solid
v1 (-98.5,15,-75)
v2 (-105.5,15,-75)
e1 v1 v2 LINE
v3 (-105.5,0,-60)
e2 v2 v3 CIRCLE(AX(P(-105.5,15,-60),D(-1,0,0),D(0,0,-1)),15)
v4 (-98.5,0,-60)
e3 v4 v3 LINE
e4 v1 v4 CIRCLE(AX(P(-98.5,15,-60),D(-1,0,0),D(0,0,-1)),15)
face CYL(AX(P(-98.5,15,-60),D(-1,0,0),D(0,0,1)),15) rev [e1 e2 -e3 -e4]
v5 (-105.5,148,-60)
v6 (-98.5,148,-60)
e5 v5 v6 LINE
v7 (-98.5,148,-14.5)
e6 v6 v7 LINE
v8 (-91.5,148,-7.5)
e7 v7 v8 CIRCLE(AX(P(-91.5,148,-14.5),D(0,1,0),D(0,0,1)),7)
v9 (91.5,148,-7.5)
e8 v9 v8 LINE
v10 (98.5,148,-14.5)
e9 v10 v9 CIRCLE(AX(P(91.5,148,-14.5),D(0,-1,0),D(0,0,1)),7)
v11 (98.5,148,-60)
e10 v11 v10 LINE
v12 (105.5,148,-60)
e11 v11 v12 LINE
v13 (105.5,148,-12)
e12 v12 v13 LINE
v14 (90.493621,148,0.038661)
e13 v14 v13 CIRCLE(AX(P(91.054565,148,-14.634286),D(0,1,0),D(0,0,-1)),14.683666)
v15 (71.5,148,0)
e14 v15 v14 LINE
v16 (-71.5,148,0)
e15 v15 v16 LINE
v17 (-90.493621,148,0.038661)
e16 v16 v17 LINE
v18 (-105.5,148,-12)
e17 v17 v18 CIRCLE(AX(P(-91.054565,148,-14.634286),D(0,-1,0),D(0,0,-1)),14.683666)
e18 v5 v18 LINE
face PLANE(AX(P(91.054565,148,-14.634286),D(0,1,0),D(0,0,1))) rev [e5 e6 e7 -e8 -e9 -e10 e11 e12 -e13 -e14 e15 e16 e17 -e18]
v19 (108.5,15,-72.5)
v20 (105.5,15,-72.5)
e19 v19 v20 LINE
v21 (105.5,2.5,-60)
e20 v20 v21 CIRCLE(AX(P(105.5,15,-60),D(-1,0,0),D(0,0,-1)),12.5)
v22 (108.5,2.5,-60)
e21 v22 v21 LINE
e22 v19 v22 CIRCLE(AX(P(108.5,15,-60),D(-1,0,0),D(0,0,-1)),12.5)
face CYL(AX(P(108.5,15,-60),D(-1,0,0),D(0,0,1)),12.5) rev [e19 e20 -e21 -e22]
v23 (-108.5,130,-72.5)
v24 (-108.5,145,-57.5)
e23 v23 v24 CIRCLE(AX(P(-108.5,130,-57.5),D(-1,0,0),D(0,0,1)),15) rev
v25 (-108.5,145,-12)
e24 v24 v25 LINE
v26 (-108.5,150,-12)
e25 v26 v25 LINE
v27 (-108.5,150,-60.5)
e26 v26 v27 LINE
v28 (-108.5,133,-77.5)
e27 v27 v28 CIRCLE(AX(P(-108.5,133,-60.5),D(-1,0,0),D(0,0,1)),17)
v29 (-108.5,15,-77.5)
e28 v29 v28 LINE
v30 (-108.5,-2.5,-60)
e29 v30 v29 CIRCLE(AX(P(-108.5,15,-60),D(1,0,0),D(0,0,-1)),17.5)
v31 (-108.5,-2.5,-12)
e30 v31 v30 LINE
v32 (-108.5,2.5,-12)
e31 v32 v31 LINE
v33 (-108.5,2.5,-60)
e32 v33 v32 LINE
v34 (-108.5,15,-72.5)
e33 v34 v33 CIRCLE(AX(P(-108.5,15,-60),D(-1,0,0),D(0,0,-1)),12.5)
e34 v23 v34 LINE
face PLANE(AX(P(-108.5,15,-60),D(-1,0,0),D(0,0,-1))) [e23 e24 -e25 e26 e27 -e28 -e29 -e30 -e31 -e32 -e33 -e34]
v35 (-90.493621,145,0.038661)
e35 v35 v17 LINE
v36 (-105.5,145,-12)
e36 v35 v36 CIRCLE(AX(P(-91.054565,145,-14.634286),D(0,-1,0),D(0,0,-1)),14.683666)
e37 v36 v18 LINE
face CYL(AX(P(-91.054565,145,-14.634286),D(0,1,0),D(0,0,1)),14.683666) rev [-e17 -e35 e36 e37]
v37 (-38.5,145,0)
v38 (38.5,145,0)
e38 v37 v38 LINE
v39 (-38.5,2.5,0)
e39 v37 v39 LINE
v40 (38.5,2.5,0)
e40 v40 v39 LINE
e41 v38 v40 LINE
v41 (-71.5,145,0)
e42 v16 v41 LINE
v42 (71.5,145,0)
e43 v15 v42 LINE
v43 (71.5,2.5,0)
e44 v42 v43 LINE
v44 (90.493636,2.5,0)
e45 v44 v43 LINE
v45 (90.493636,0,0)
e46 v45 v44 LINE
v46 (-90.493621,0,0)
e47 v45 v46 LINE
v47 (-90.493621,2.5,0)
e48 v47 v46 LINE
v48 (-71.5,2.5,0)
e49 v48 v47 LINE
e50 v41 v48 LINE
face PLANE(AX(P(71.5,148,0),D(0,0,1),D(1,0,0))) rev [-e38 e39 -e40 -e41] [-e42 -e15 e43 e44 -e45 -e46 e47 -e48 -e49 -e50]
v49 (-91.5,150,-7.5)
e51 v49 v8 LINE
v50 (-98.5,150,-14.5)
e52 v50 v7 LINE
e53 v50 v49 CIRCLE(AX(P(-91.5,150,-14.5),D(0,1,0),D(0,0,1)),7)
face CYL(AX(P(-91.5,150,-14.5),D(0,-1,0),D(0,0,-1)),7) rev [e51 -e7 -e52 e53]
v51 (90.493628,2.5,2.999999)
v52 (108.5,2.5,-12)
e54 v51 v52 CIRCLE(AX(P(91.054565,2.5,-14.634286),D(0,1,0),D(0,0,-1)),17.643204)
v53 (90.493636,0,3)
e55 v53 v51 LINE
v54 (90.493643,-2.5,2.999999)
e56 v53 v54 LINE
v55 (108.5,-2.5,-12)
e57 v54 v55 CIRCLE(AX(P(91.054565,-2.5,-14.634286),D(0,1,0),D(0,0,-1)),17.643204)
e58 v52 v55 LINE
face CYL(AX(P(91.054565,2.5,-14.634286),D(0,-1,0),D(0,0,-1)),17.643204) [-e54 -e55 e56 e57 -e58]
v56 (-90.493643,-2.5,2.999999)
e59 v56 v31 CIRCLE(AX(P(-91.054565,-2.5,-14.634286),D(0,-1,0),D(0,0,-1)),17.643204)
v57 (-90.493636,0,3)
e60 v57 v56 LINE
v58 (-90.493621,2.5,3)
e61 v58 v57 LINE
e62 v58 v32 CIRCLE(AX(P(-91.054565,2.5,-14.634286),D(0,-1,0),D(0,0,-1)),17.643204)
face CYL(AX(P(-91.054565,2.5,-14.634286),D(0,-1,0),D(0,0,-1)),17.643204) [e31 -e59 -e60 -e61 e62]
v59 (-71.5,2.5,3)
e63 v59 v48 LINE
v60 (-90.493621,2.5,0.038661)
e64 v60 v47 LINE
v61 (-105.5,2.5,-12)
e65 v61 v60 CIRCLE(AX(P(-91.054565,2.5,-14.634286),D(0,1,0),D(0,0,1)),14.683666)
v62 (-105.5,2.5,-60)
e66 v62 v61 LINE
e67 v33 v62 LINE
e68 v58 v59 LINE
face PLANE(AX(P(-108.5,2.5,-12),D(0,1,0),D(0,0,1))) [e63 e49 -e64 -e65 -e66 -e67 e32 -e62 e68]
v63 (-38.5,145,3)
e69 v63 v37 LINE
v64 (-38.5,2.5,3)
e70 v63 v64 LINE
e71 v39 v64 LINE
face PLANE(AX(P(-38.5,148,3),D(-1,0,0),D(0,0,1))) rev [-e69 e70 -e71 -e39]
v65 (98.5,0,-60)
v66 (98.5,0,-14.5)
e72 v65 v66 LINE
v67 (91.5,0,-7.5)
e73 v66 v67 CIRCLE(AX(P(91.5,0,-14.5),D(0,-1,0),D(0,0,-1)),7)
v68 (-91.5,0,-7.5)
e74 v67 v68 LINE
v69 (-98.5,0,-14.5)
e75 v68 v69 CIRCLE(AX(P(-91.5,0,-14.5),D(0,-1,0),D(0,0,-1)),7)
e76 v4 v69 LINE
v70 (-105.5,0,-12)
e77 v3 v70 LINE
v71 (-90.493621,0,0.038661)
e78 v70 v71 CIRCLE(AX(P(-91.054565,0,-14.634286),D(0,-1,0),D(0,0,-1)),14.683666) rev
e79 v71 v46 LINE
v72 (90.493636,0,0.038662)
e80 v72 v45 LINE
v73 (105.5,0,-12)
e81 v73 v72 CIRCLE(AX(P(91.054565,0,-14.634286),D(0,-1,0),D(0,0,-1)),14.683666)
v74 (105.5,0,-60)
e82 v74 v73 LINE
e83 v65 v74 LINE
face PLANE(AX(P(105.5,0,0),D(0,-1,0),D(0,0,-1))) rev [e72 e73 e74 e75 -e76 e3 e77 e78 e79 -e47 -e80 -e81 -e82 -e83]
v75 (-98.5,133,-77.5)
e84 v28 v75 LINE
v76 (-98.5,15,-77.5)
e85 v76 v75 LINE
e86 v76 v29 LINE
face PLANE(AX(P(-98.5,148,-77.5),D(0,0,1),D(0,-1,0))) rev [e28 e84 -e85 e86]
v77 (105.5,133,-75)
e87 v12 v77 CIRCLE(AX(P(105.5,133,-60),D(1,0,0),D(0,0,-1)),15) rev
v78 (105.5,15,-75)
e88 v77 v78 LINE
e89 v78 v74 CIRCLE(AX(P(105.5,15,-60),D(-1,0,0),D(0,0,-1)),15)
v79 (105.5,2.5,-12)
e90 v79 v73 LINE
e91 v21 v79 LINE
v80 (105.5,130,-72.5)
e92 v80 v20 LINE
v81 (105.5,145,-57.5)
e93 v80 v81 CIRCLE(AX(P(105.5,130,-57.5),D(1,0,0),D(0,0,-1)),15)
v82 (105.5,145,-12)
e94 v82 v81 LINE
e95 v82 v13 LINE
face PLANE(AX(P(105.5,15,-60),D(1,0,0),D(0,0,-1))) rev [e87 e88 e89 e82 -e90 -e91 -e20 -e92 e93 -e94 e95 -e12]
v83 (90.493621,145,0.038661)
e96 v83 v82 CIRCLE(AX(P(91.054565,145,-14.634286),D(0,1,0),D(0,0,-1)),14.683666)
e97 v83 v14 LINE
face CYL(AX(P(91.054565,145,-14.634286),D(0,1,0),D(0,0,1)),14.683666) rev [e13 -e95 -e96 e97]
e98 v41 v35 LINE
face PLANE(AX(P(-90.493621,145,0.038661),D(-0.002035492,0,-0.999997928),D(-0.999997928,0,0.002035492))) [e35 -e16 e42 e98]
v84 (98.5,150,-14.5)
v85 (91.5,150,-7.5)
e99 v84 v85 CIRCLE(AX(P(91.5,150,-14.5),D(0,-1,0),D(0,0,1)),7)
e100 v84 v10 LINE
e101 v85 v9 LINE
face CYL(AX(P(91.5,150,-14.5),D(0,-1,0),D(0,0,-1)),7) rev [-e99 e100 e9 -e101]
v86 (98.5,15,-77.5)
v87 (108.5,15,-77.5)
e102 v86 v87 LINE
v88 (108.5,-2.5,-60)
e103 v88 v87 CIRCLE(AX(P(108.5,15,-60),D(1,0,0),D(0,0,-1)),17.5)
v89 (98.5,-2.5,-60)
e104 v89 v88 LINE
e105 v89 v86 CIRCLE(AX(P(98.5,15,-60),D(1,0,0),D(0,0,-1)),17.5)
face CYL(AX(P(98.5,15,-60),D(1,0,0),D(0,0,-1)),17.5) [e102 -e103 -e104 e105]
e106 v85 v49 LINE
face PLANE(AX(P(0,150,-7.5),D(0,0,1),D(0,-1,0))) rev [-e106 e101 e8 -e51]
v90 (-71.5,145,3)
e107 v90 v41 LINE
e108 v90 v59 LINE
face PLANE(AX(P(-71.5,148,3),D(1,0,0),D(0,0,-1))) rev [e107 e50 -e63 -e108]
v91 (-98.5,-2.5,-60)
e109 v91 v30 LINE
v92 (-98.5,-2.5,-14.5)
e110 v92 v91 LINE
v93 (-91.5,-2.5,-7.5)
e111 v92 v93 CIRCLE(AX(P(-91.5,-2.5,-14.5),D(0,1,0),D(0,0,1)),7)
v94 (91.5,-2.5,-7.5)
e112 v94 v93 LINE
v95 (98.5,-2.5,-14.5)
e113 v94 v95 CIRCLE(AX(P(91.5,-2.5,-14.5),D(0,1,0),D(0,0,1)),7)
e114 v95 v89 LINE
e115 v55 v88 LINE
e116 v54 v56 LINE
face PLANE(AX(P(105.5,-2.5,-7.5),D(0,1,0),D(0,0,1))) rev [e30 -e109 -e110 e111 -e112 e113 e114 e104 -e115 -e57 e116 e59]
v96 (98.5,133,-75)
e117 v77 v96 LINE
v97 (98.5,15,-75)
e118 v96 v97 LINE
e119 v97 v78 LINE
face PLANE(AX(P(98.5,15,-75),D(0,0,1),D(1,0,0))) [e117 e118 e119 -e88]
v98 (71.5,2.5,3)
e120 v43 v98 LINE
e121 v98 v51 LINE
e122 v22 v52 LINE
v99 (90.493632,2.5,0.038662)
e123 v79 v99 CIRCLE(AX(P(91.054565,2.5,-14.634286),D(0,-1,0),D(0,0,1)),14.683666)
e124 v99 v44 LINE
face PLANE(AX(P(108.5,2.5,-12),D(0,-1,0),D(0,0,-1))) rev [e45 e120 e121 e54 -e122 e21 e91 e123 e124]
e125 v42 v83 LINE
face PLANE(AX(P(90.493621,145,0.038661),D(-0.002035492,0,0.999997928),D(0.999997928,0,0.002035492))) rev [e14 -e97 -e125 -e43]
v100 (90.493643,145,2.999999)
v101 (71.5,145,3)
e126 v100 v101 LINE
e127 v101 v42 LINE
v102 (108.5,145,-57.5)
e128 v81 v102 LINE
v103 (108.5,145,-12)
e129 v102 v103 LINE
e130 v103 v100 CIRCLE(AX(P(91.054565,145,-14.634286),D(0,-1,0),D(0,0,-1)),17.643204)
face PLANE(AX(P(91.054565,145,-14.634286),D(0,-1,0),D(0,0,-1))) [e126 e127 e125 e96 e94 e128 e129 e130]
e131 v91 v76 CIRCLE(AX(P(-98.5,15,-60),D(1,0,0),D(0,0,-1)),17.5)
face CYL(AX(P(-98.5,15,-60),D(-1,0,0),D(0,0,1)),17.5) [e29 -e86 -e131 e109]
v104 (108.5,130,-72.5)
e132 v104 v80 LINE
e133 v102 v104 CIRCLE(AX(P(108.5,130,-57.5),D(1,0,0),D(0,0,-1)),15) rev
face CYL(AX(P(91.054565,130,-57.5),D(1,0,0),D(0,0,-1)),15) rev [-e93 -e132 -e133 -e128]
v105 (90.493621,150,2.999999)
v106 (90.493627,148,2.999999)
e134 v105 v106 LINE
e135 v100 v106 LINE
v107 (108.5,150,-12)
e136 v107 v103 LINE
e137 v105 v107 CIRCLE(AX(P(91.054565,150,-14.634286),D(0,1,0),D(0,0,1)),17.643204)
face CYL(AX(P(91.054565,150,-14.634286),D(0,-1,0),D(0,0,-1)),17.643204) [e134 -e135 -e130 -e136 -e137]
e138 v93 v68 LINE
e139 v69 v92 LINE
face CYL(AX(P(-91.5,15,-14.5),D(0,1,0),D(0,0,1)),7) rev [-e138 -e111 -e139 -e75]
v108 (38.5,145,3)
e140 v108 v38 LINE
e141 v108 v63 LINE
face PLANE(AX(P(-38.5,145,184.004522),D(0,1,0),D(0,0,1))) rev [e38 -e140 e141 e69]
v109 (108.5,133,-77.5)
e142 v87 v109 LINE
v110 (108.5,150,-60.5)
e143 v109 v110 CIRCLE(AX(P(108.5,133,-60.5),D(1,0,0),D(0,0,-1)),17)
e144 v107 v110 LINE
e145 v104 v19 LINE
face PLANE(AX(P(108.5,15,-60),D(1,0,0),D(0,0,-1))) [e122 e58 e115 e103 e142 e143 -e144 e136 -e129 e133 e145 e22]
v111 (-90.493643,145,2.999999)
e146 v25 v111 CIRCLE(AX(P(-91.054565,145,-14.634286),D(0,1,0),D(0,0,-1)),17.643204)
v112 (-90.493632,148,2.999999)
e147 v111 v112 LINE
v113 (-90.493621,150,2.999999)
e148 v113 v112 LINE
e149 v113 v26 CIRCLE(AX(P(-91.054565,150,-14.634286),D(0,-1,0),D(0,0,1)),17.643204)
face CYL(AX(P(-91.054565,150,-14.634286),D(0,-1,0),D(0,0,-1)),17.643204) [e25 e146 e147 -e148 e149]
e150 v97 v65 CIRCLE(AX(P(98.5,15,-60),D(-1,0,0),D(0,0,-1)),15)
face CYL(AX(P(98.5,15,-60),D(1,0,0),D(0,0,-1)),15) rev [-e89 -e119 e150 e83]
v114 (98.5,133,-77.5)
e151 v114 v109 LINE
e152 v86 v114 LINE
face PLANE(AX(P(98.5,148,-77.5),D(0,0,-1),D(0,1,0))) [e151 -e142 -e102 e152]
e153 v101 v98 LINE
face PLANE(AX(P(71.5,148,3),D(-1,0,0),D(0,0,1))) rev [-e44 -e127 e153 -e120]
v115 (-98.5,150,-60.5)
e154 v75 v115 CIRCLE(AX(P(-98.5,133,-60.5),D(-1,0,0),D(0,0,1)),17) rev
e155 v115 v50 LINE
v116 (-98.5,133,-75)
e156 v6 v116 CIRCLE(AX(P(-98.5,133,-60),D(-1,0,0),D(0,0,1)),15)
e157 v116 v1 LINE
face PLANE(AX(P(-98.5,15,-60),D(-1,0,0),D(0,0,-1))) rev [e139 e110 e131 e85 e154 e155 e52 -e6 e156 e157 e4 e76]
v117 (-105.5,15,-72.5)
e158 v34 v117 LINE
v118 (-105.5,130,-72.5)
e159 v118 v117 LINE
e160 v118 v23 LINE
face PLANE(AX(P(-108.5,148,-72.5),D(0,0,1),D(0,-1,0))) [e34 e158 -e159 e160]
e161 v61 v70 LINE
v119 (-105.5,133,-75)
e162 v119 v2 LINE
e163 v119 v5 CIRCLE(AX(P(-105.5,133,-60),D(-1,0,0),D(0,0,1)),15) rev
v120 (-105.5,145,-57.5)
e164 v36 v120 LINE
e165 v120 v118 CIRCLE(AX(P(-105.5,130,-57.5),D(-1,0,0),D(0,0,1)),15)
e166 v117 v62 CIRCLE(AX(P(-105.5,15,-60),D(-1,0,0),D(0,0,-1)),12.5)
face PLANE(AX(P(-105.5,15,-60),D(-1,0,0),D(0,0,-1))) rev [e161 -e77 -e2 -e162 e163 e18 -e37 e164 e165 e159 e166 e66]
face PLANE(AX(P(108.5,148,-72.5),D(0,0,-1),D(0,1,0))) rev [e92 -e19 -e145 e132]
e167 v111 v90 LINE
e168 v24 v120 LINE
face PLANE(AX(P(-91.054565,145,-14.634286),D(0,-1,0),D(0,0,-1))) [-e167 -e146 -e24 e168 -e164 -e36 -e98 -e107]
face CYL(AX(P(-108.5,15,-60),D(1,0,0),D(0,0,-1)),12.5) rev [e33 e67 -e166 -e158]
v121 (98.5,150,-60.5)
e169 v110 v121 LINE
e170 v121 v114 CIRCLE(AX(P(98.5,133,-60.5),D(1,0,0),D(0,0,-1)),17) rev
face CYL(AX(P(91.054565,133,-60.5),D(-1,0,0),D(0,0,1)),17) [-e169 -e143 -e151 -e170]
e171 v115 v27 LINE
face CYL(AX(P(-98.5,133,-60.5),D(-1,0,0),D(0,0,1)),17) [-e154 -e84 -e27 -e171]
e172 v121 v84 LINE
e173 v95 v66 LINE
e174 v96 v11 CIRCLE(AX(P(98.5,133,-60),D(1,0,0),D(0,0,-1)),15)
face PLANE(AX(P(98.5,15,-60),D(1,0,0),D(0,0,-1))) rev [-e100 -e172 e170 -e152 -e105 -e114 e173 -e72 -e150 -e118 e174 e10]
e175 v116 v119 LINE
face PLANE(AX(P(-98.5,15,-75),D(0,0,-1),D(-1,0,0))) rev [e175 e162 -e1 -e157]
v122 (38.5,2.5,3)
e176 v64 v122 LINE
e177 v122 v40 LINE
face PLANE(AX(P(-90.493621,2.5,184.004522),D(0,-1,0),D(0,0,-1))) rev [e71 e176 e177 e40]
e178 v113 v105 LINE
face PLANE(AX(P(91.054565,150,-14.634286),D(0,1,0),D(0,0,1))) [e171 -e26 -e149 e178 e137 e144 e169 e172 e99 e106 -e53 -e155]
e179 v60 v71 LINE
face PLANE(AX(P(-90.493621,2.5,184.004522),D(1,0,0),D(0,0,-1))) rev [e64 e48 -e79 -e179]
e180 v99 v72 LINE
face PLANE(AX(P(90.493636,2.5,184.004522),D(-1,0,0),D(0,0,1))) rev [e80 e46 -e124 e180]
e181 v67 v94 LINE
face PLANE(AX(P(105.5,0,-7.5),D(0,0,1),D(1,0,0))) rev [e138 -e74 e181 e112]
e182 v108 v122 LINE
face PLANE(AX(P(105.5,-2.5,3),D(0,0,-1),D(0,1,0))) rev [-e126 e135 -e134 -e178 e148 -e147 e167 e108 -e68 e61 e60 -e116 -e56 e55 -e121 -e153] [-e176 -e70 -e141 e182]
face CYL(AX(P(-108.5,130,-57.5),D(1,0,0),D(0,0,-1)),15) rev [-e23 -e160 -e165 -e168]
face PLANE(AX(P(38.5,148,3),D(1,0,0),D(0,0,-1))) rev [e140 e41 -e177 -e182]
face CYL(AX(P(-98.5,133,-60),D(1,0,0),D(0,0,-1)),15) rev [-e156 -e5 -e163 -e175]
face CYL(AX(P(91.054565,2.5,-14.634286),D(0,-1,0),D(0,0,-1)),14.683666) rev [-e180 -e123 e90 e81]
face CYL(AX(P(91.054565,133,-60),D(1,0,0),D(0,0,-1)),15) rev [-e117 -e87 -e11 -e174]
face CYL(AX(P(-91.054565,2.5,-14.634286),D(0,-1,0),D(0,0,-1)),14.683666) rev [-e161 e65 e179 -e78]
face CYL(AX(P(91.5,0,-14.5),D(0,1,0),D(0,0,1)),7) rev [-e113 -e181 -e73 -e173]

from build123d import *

# Parameters (mm, degrees)
EXTRUDE_1_DEPTH        = 105.5
EXTRUDE_3_DEPTH        = 7
FILLET_2_R             = 15
SKETCH_6_W             = 33
SKETCH_6_H             = 3
EXTRUDE_4_DEPTH        = 148
EXTRUDE_START          = 3
EXTRUDE_5_DEPTH        = 3
EXTRUDE_6_DEPTH        = 2.5
FILLET_3_R             = 7
EXTRUDE_START_2        = 2
EXTRUDE_7_DEPTH        = 2
EXTRUDE_8_DEPTH        = 3
FILLET_4_R             = 15
FILLET_5_R             = 17
FILLET_3_OF_MIRROR_1_R = 7
FILLET_4_OF_MIRROR_1_R = 15
FILLET_5_OF_MIRROR_1_R = 17
EXTRUDE_9_OUTLINE_W    = 77
EXTRUDE_9_OUTLINE_H    = 3
EXTRUDE_9_DEPTH        = 2.5
EXTRUDE_START_3        = 145
EXTRUDE_9_2_OUTLINE_W  = 77
EXTRUDE_9_2_OUTLINE_H  = 3
EXTRUDE_9_2_DEPTH      = 3


# Read off the part's stored shape, not the designer's step: 보스-돌출9
with BuildPart() as part:
    # 스케치1 → 보스-돌출1 (new, symmetric)
    with BuildSketch(Plane(origin=(0, 0, 0), x_dir=(0, 0, -1), z_dir=(1, 0, 0))):
        Polygon((0, 0), (7.5, 0), (7.5, -2.5), (-3, -2.5), (-3, 0), align=None)
    extrude(amount=EXTRUDE_1_DEPTH, both=True)

    # 스케치5 → 보스-돌출3 (add)
    with BuildSketch(Plane(origin=(105.5, 0, 0), x_dir=(0, 0, -1), z_dir=(1, 0, 0))):
        with BuildLine():
            Line((7.5, 0), (60, 0))
            ThreePointArc((60, 0), (70.606601718, 4.393398282), (75, 15))
            Line((75, 15), (75, 148))
            Line((75, 148), (77.5, 148))
            Line((77.5, 148), (77.5, 15))
            ThreePointArc((77.5, 15), (72.374368671, 2.625631329), (60, -2.5))
            Line((60, -2.5), (7.5, -2.5))
            Line((7.5, -2.5), (7.5, 0))
        make_face()
    extrude_3 = extrude(amount=-EXTRUDE_3_DEPTH)

    # 필렛2
    # the kernel refuses this fillet: 15 mm, written as the material it takes off along each edge
    with BuildSketch(Plane(origin=(-105.5, -38.272720053, 3), x_dir=(0, 0, -1), z_dir=(0, 1, 0))) as fillet_2_piece_1:
        with BuildLine():
            CenterArc((15, -14.309088021), FILLET_2_R, 107.457603124, 72.542396876)
            Line((0, -14.309088021), (-0.3, -14.309088021))
            Line((-0.3, -14.309088021), (-0.3, 0))
            Line((-0.3, 0), (0, 0.3))
            ThreePointArc((0, 0.3), (5.25, 0.3), (10.41, 0.28618176))
            Line((10.41, 0.28618176), (10.5, 0))
        make_face()
    extrude(amount=74.045440106, mode=Mode.SUBTRACT)
    with BuildSketch(Plane(origin=(105.5, -40, 3), x_dir=(-1, 0, 0), z_dir=(0, 1, 0))) as fillet_2_piece_2:
        with BuildLine():
            CenterArc((FILLET_2_R, -FILLET_2_R), FILLET_2_R, 90, 90)
            Line((0, -FILLET_2_R), (-FILLET_2_R * 0.02, -FILLET_2_R))
            Line((-FILLET_2_R * 0.02, -FILLET_2_R), (-FILLET_2_R * 0.02, FILLET_2_R * 0.02))
            Line((-FILLET_2_R * 0.02, FILLET_2_R * 0.02), (FILLET_2_R, FILLET_2_R * 0.02))
            Line((FILLET_2_R, FILLET_2_R * 0.02), (FILLET_2_R, 0))
        make_face()
    extrude(amount=77.5, mode=Mode.SUBTRACT)

    # 스케치6 → 보스-돌출4 (add)
    with BuildSketch(Plane(origin=(0, 0, 0), x_dir=(1, 0, 0), z_dir=(0, 1, 0))):
        with Locations((55, -1.5)):
            Rectangle(SKETCH_6_W, SKETCH_6_H)
        with Locations((-55, -1.5)):
            Rectangle(SKETCH_6_W, SKETCH_6_H)
    extrude(amount=EXTRUDE_4_DEPTH)

    # 스케치7 → 보스-돌출5 (add)
    with BuildSketch(Plane(origin=(105.5, 0, 0), x_dir=(0, 0, -1), z_dir=(1, 0, 0)).offset(EXTRUDE_START)):
        with BuildLine():
            Line((75, 148), (72.5, 148))
            Line((72.5, 148), (72.5, 15))
            ThreePointArc((72.5, 15), (68.838834765, 6.161165235), (60, 2.5))
            Line((60, 2.5), (12, 2.5))
            Line((12, 2.5), (12, 0))
            Line((12, 0), (12, -2.5))
            Line((12, -2.5), (60, -2.5))
            ThreePointArc((60, -2.5), (72.374368671, 2.625631329), (77.5, 15))
            Line((77.5, 15), (77.5, 148))
            Line((77.5, 148), (75, 148))
        make_face()
    extrude_5 = extrude(amount=-EXTRUDE_5_DEPTH)

    # 스케치8 → 보스-돌출6 (add, symmetric)
    with BuildSketch(Plane(origin=(0, 0, 0), x_dir=(1, 0, 0), z_dir=(0, 1, 0))):
        with BuildLine():
            Line((105.5, 12), (108.5, 12))
            ThreePointArc((108.5, 12), (102.347106917, 1.078432733), (90.493621255, -2.999998644))
            Line((90.493621255, -2.999998644), (90.493621255, -0.038661453))
            ThreePointArc((90.493621255, -0.038661453), (100.242988055, 3.180774174), (105.5, 12))
        make_face()
    extrude_6 = extrude(amount=EXTRUDE_6_DEPTH, both=True)

    # 필렛3
    fillet_3_edges = [part.edges().sort_by_distance(p)[0] for p in [
        (98.5, -1.25, -7.5),
    ]]
    fillet(fillet_3_edges, radius=FILLET_3_R)

    # 스케치10 → 보스-돌출7 (add)
    with BuildSketch(Plane(origin=(0, 148, 0), x_dir=(1, 0, 0), z_dir=(0, 1, 0)).offset(EXTRUDE_START_2)):
        with BuildLine():
            Line((98.5, 77.5), (98.5, 14.5))
            ThreePointArc((98.5, 14.5), (96.449747468, 9.550252532), (91.5, 7.5))
            Line((91.5, 7.5), (0, 7.5))
            Line((0, 7.5), (0, -2.999998644))
            Line((0, -2.999998644), (90.493621255, -2.999998644))
            ThreePointArc((90.493621255, -2.999998644), (102.347106917, 1.078432733), (108.5, 12))
            Line((108.5, 12), (108.5, 77.5))
            Line((108.5, 77.5), (98.5, 77.5))
        make_face()
    extrude_7 = extrude(amount=-EXTRUDE_7_DEPTH)

    # 스케치11 → 보스-돌출8 (add)
    with BuildSketch(Plane.XZ.offset(-148)):
        with BuildLine():
            Line((105.5, -60), (105.5, -72.5))
            Line((105.5, -72.5), (108.5, -72.5))
            Line((108.5, -72.5), (108.5, -60))
            Line((108.5, -60), (108.5, -12))
            ThreePointArc((108.5, -12), (102.347115112, -1.078439559), (90.493642574, 2.999999322))
            Line((90.493642574, 2.999999322), (71.5, 3))
            Line((71.5, 3), (71.5, 0))
            Line((71.5, 0), (90.493621255, 0.038661453))
            ThreePointArc((90.493621255, 0.038661453), (100.242988055, -3.180774174), (105.5, -12))
            Line((105.5, -12), (105.5, -60))
        make_face()
    extrude_8 = extrude(amount=EXTRUDE_8_DEPTH)

    # 필렛4
    fillet_4_edges = [part.edges().sort_by_distance(p)[0] for p in [
        (107, 145, -72.5),
        (102, 148, -75),
    ]]
    fillet(fillet_4_edges, radius=FILLET_4_R)

    # 필렛5
    fillet_5_edges = [part.edges().sort_by_distance(p)[0] for p in [
        (103.5, 150, -77.5),
    ]]
    fillet(fillet_5_edges, radius=FILLET_5_R)

    # 대칭 복사1: 보스-돌출3, 보스-돌출5, 보스-돌출6, 보스-돌출7, 보스-돌출8 across plane
    add(extrude_3.mirror(Plane(origin=(0, 0, 0), x_dir=(0, 0, 1), z_dir=(1, 0, 0))))
    add(extrude_5.mirror(Plane(origin=(0, 0, 0), x_dir=(0, 0, 1), z_dir=(1, 0, 0))))
    add(extrude_6.mirror(Plane(origin=(0, 0, 0), x_dir=(0, 0, 1), z_dir=(1, 0, 0))))
    add(extrude_7.mirror(Plane(origin=(0, 0, 0), x_dir=(0, 0, 1), z_dir=(1, 0, 0))))
    add(extrude_8.mirror(Plane(origin=(0, 0, 0), x_dir=(0, 0, 1), z_dir=(1, 0, 0))))

    # 필렛3 of 대칭 복사1
    fillet_3_of_mirror_1_edges = [part.edges().sort_by_distance(p)[0] for p in [
        (-98.5, -1.25, -7.5),
    ]]
    fillet(fillet_3_of_mirror_1_edges, radius=FILLET_3_OF_MIRROR_1_R)

    # 필렛4 of 대칭 복사1
    fillet_4_of_mirror_1_edges = [part.edges().sort_by_distance(p)[0] for p in [
        (-107, 145, -72.5),
        (-102, 148, -75),
    ]]
    fillet(fillet_4_of_mirror_1_edges, radius=FILLET_4_OF_MIRROR_1_R)

    # 필렛5 of 대칭 복사1
    fillet_5_of_mirror_1_edges = [part.edges().sort_by_distance(p)[0] for p in [
        (-103.5, 150, -77.5),
    ]]
    fillet(fillet_5_of_mirror_1_edges, radius=FILLET_5_OF_MIRROR_1_R)

    # 보스-돌출9 outline → 보스-돌출9 (add)
    with BuildSketch(Plane(origin=(0, 0, 0), x_dir=(1, 0, 0), z_dir=(0, 1, 0))):
        Polygon((-90.493621255, 0), (-90.493631914, -2.999999778), (-71.5, -3), (-71.5, 0), align=None)
        with Locations((0, -1.5)):
            Rectangle(EXTRUDE_9_OUTLINE_W, EXTRUDE_9_OUTLINE_H)
        Polygon((90.493635587, 0), (71.5, 0), (71.5, -3), (90.493642574, -3), (90.493621255, -0.038661453), align=None)
    extrude(amount=EXTRUDE_9_DEPTH)

    # Extrude 9 2 outline → Extrude 9 2 (add)
    with BuildSketch(Plane(origin=(0, 0, 0), x_dir=(1, 0, 0), z_dir=(0, 1, 0)).offset(EXTRUDE_START_3)):
        with Locations((0, -1.5)):
            Rectangle(EXTRUDE_9_2_OUTLINE_W, EXTRUDE_9_2_OUTLINE_H)
    extrude(amount=EXTRUDE_9_2_DEPTH)


solid = part.part
